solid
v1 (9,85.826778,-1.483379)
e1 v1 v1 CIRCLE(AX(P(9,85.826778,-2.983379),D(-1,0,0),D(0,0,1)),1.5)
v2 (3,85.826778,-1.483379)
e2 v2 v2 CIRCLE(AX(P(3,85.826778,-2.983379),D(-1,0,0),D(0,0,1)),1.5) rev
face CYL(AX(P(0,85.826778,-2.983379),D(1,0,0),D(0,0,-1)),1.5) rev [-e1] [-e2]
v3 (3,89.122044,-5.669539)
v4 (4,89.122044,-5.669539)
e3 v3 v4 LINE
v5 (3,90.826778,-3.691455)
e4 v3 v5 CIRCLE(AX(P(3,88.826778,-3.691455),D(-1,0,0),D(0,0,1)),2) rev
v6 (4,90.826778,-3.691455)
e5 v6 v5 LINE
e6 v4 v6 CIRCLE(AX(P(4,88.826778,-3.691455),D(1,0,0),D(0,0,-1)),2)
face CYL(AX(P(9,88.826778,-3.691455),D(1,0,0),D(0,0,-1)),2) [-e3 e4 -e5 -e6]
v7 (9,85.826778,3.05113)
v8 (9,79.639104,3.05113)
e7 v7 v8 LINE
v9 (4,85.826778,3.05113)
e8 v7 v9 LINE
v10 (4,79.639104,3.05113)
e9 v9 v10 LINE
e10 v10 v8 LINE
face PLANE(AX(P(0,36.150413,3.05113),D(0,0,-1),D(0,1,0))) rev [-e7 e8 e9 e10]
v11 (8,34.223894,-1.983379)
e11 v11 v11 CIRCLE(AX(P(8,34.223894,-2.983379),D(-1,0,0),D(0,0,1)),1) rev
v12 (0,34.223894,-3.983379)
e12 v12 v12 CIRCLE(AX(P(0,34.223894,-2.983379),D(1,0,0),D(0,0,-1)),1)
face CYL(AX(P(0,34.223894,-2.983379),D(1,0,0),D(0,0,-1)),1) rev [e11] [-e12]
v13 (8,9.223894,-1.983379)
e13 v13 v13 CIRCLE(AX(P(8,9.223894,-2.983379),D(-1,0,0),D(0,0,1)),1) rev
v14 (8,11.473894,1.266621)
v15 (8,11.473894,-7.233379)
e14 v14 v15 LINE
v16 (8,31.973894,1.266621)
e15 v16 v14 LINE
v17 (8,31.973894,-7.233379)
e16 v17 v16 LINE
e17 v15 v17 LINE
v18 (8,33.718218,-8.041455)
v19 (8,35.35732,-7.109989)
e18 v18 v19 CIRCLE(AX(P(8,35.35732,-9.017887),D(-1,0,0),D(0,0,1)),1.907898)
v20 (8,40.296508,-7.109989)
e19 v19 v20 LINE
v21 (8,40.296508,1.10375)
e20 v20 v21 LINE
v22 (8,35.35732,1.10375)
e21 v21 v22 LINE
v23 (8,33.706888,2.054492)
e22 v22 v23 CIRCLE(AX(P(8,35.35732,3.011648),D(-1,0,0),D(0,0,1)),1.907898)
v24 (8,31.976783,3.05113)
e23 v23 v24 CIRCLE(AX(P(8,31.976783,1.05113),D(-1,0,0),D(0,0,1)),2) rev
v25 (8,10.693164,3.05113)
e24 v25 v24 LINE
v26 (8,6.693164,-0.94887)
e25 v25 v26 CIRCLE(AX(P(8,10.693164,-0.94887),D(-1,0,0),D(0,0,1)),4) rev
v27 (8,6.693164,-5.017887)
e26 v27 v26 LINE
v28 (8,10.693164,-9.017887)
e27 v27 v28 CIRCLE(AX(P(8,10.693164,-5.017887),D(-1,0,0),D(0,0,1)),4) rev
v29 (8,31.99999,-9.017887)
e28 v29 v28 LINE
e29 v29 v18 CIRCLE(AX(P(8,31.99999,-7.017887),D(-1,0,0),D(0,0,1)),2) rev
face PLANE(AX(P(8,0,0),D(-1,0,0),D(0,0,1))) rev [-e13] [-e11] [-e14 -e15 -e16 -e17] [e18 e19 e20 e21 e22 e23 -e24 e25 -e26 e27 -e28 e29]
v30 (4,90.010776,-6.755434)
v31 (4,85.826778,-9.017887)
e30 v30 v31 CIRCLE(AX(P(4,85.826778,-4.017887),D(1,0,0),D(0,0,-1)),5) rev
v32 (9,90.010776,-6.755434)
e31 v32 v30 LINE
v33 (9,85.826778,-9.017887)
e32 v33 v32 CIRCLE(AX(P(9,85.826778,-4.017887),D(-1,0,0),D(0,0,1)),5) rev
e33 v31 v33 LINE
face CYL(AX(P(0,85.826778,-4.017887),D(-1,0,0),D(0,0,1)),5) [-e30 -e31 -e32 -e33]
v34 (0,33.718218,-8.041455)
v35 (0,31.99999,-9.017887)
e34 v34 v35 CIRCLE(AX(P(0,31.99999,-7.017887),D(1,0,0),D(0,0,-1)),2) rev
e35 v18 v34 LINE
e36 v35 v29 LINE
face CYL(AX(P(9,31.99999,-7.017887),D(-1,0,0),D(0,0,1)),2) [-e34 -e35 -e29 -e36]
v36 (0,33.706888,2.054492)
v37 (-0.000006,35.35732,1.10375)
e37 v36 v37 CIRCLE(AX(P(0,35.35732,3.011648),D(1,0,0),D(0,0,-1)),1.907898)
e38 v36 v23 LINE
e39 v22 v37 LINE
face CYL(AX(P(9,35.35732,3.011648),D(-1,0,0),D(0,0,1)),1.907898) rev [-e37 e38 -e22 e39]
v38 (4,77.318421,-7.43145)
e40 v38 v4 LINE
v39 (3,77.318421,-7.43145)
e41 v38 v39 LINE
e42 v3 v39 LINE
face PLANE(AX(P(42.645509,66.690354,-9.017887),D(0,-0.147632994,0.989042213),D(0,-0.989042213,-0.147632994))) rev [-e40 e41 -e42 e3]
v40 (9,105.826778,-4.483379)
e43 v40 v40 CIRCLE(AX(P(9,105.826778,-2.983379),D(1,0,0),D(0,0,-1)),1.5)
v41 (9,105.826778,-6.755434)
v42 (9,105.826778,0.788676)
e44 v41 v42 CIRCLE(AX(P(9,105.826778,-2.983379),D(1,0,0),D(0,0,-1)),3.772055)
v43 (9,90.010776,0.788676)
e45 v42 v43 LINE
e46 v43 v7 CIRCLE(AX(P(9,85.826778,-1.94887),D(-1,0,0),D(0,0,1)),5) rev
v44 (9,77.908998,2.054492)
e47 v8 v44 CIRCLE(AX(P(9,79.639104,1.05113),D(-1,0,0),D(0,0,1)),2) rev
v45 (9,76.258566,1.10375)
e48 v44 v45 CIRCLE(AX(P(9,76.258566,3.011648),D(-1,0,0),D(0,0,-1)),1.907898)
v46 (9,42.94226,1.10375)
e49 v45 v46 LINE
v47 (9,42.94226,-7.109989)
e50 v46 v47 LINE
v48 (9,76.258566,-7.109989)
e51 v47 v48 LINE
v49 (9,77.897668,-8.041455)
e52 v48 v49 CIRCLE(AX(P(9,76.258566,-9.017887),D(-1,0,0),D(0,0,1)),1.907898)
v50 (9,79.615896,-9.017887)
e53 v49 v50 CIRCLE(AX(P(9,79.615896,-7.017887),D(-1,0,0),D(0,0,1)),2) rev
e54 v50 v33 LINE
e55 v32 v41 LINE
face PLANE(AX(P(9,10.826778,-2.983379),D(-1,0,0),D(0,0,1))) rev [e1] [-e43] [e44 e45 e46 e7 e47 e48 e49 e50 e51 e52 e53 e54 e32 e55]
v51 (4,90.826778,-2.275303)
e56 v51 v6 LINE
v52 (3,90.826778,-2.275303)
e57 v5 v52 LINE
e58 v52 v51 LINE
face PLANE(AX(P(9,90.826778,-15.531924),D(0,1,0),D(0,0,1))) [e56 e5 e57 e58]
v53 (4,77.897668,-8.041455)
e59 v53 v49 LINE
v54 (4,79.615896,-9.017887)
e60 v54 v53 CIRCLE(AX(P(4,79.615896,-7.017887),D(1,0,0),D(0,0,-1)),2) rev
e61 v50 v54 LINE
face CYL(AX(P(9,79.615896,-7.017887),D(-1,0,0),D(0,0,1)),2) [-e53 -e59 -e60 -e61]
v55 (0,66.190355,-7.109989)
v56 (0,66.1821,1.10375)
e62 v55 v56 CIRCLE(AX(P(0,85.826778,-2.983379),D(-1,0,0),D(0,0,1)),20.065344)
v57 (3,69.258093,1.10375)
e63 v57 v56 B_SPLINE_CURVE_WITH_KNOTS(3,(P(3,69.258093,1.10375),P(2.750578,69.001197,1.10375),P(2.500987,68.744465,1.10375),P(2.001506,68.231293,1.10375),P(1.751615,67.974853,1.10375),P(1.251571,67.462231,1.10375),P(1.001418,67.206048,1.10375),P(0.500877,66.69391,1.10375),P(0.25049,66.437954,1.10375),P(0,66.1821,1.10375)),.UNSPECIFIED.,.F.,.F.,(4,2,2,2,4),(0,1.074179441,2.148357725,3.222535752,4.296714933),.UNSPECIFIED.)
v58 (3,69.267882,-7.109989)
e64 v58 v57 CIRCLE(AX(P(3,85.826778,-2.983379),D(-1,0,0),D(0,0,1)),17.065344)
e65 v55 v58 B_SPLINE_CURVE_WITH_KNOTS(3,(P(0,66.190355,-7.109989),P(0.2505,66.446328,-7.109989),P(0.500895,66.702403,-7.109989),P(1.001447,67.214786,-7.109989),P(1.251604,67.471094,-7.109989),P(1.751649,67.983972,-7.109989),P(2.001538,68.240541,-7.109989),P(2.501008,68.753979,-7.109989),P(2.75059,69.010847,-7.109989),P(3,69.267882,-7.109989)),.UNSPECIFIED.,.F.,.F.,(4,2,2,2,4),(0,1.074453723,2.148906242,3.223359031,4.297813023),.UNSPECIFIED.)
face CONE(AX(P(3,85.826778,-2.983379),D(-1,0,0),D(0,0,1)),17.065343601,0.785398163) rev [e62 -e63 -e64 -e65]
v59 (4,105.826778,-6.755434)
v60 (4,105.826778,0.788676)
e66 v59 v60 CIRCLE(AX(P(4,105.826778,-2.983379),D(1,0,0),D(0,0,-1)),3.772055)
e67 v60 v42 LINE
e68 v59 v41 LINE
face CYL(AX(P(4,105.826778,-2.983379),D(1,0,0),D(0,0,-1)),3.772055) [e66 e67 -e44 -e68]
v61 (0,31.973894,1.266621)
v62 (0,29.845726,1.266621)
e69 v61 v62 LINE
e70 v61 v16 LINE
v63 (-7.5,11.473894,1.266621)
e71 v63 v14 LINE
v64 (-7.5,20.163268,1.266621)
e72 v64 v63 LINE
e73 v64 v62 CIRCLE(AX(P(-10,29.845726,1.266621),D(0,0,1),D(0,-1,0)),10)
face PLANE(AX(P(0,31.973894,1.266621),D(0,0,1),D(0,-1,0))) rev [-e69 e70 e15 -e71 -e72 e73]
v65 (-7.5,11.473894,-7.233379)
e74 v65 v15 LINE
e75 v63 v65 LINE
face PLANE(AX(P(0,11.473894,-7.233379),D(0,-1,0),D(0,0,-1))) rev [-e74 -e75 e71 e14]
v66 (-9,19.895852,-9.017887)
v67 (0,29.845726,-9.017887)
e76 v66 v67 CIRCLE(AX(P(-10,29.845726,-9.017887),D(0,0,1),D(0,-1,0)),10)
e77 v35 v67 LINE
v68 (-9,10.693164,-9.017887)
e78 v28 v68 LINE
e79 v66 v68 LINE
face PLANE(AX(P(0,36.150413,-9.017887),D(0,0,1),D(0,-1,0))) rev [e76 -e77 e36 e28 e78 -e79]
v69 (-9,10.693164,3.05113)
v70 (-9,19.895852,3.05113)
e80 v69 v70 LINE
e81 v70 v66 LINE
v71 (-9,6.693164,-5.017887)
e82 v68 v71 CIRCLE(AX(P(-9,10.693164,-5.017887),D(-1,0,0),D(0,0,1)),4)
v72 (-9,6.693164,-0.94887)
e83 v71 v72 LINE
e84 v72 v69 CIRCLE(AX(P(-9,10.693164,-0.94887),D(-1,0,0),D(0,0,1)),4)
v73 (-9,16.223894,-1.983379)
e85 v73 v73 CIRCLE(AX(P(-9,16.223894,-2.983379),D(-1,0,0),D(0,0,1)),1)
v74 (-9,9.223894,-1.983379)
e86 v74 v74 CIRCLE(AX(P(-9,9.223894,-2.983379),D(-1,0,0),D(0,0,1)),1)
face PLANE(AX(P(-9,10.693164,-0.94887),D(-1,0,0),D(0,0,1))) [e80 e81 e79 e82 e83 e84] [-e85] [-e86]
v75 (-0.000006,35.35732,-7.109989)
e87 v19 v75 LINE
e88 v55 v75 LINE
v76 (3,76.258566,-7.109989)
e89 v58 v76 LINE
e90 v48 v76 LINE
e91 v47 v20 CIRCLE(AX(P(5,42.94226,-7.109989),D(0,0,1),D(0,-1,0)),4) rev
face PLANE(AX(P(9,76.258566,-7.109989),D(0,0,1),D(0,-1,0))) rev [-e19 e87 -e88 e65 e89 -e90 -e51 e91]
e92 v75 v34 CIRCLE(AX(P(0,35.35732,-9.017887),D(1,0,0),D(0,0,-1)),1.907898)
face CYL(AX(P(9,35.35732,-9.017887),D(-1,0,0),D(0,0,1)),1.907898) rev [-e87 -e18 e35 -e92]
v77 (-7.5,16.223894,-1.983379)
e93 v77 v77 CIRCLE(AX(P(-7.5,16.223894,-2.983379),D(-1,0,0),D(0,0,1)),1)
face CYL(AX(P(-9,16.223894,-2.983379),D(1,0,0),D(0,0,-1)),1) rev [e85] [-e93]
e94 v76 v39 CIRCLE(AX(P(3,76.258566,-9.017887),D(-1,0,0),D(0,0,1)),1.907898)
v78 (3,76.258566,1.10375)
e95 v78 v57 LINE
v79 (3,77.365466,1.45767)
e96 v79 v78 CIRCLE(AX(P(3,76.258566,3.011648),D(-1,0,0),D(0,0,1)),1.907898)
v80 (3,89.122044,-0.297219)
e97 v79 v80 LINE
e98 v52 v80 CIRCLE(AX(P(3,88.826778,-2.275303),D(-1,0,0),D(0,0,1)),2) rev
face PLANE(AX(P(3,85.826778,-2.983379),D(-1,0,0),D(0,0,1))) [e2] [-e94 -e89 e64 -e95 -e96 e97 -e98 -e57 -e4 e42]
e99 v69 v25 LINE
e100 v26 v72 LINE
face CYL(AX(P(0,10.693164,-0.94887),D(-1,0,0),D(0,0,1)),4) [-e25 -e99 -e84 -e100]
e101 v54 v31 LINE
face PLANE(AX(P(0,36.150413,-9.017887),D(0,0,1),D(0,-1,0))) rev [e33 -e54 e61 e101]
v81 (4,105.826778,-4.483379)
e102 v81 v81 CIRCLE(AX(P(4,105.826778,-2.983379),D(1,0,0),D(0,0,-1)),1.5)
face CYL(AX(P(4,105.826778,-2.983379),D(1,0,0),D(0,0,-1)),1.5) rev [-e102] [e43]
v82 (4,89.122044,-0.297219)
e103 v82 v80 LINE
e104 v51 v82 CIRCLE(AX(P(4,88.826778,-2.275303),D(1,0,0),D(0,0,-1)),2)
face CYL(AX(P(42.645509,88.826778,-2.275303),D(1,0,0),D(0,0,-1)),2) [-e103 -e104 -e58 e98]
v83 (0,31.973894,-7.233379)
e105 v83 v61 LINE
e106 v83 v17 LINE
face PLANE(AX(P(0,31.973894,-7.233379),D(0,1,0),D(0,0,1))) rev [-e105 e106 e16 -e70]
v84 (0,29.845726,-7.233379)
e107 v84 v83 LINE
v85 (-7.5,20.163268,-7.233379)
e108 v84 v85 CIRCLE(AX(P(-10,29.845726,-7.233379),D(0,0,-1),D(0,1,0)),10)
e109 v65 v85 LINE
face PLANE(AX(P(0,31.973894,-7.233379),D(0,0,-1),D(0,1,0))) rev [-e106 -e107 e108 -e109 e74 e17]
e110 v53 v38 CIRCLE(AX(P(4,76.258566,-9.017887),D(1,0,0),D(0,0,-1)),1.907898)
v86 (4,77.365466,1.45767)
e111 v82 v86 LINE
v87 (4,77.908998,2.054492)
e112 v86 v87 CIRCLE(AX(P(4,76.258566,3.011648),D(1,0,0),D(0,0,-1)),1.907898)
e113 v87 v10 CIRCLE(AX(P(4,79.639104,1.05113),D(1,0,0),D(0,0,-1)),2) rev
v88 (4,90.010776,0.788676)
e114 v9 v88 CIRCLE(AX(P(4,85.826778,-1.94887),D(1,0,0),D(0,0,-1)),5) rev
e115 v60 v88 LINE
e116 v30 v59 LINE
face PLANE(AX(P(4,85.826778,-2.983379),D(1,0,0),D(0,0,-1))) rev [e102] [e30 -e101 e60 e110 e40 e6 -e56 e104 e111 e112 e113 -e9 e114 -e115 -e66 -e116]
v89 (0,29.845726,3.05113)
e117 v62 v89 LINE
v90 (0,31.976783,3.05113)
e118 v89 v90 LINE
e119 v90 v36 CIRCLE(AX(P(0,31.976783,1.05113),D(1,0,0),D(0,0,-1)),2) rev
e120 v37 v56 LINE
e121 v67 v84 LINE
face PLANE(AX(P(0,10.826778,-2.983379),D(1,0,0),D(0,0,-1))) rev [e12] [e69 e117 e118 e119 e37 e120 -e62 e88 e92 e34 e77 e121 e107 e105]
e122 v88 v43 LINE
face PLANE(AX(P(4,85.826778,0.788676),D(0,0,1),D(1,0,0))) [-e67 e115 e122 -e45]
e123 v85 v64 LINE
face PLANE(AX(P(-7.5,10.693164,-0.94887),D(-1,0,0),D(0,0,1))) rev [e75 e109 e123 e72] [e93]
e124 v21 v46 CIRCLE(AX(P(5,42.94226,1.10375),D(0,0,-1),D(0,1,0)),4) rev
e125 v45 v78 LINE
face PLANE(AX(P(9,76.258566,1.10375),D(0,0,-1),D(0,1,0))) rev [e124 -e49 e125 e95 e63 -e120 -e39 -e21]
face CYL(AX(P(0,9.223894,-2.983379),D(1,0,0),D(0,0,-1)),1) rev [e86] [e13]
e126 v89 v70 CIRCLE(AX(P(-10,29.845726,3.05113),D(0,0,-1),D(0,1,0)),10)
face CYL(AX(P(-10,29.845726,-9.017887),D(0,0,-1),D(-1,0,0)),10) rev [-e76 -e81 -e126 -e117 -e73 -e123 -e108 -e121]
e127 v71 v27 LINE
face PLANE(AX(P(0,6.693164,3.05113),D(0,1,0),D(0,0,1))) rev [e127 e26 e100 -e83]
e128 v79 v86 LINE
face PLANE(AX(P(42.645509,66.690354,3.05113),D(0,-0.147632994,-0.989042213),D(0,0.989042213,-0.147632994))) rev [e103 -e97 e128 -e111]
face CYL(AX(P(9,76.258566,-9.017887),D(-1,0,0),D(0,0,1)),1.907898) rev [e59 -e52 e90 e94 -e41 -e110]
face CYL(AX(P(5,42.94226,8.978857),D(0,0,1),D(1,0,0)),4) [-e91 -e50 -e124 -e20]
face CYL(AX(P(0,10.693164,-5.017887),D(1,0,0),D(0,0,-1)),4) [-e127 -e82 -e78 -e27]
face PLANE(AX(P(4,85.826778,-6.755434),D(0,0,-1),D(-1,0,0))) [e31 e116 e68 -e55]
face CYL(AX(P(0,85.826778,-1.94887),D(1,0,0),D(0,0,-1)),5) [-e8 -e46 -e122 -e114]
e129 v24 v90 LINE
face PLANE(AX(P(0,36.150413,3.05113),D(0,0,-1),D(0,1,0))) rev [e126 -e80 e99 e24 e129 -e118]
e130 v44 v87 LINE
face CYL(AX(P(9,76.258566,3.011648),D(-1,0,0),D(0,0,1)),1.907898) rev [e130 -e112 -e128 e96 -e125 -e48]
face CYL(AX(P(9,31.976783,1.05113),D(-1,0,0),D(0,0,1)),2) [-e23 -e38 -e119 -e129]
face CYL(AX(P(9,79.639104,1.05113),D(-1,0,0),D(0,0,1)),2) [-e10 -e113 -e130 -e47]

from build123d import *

# Parameters (mm, degrees)
SKETCH1_R               = 10
SKETCH1_R_2             = 0.8
SKETCH1_R_3             = 3.301767793
BOSS_EXTRUDE1_DEPTH     = 1.5
SKETCH2_R               = 10
BOSS_EXTRUDE2_DEPTH     = 9
CUT_EXTRUDE1_DEPTH      = 93.583714931
CUT_EXTRUDE1_DEPTH_BACK = 93.583714931
SKETCH3_R               = 1.5
FILLET1_R               = 5
SKETCH4_R               = 1.5
BOSS_EXTRUDE3_DEPTH     = 5
CUT_EXTRUDE2_DEPTH      = 4
FILLET3_R               = 2
SKETCH6_W               = 12.069016708
SKETCH6_H               = 36.150412664
BOSS_EXTRUDE4_DEPTH     = 9
CUT_EXTRUDE3_DEPTH      = 112.059195252
CUT_EXTRUDE3_DEPTH_BACK = 112.059195252
CUT_EXTRUDE4_DEPTH      = 111.336877259
CUT_EXTRUDE4_DEPTH_BACK = 111.336877259
SKETCH8_R               = 1
SKETCH8_W               = 8.5
SKETCH8_H               = 20.5
FILLET4_R               = 4
SKETCH9_W               = 24.382356312
SKETCH9_H               = 41.210730196
CUT_EXTRUDE5_DEPTH      = 1
FILLET5_R               = 4
SKETCH10_R              = 20.065343601
CUT_EXTRUDE6_DEPTH      = 3
CUT_EXTRUDE7_DEPTH      = 111.33687725
CUT_EXTRUDE7_DEPTH_BACK = 111.33687725
FILLET6_R               = 2
CHAMFER1_SIZE           = 3
BOSS_EXTRUDE5_START     = 9
SKETCH12_R              = 1
BOSS_EXTRUDE5_DEPTH     = 9
SKETCH14_W              = 8.5
SKETCH14_H              = 8.421957495
CUT_EXTRUDE8_DEPTH      = 7.5
FILLET7_R               = 10


# Some blends are built 0.0001 mm under size
with BuildPart() as part:
    # Sketch1 → Boss-Extrude1 (new body)
    with BuildSketch(Plane(origin=(0, 0, 0), x_dir=(0, 0, -1), z_dir=(1, 0, 0))):
        with Locations((2.983378847, 10.826778074)):
            Circle(SKETCH1_R)
        with Locations((2.983378847, 18.576778074)):
            Circle(SKETCH1_R_2, mode=Mode.SUBTRACT)
        with Locations((2.983378847, 3.076778074)):
            Circle(SKETCH1_R_2, mode=Mode.SUBTRACT)
        with Locations((-3.266621153, 10.826778074)):
            Circle(SKETCH1_R_2, mode=Mode.SUBTRACT)
        with Locations((9.233378847, 10.826778074)):
            Circle(SKETCH1_R_2, mode=Mode.SUBTRACT)
        with Locations((2.983378847, 10.826778074)):
            Circle(SKETCH1_R_3, mode=Mode.SUBTRACT)
    extrude(amount=BOSS_EXTRUDE1_DEPTH)

    # Sketch2 → Boss-Extrude2 (add)
    with BuildSketch(Plane.ZY):
        with BuildLine():
            Line((-15.531923741, 90.826778074), (9.565166047, 90.826778074))
            Line((9.565166047, 90.826778074), (9.565166047, 10.826778074))
            ThreePointArc((9.565166047, 10.826778074), (-2.983378847, -1.721766821), (-15.531923741, 10.826778074))
            Line((-15.531923741, 10.826778074), (-15.531923741, 90.826778074))
        make_face()
        with Locations((-2.983378847, 10.826778074)):
            Circle(SKETCH2_R, mode=Mode.SUBTRACT)
    extrude(amount=-BOSS_EXTRUDE2_DEPTH)

    # Sketch3 → Cut-Extrude1 (cut, two sides: drawn at the far end of the back side and taken through both)
    with BuildSketch(Plane(origin=(9, 0, 0), x_dir=(0, 0, -1), z_dir=(1, 0, 0)).offset(-CUT_EXTRUDE1_DEPTH_BACK)):
        with Locations((2.983378847, 85.826778074)):
            Circle(SKETCH3_R)
        with BuildLine():
            Line((-3.051129507, 36.150412664), (-3.051129507, 97.572569437))
            Line((-3.051129507, 97.572569437), (-16.389018159, 97.572569437))
            Line((-16.389018159, 97.572569437), (-16.389018159, 8.14109285))
            Line((-16.389018159, 8.14109285), (-9.565166047, 10.826778074))
            add(Edge.make_bspline(
                [(-9.565166047, 10.826778074), (-9.644230884, 15.122204253), (-6.916245701, 23.507010268), (-3.42826878, 31.561714956), (-3.051129507, 36.150412664)],
                knots=[0, 0, 0, 0, 0.482384809, 1, 1, 1, 1], degree=3))
        make_face()
        with BuildLine():
            Line((22.355775853, 8.14109285), (15.531923741, 10.826778074))
            add(Edge.make_bspline(
                [(15.531923741, 10.826778074), (15.610988578, 15.122204253), (12.883003395, 23.507010268), (9.395026474, 31.561714956), (9.017887201, 36.150412664)],
                knots=[0, 0, 0, 0, 0.482384809, 1, 1, 1, 1], degree=3))
            Line((9.017887201, 36.150412664), (9.017887201, 97.572569437))
            Line((9.017887201, 97.572569437), (22.355775853, 97.572569437))
            Line((22.355775853, 97.572569437), (22.355775853, 8.14109285))
        make_face()
    extrude(amount=CUT_EXTRUDE1_DEPTH + CUT_EXTRUDE1_DEPTH_BACK, mode=Mode.SUBTRACT)

    # Fillet1
    fillet1_edges = [part.edges().sort_by_distance(p)[0] for p in [
        (4.5, 90.826778074, 3.051129507),
        (4.5, 90.826778074, -9.017887201),
    ]]
    fillet(fillet1_edges, radius=FILLET1_R)

    # Sketch4 → Boss-Extrude3 (add)
    with BuildSketch(Plane(origin=(9, 0, 0), x_dir=(0, 0, -1), z_dir=(1, 0, 0))):
        with BuildLine():
            Line((-0.788675957, 85.826778074), (-0.788675957, 105.826778074))
            ThreePointArc((-0.788675957, 105.826778074), (2.983378847, 109.598832877), (6.755433651, 105.826778074))
            Line((6.755433651, 105.826778074), (6.755433651, 85.826778074))
            ThreePointArc((6.755433651, 85.826778074), (2.983378847, 82.05472327), (-0.788675957, 85.826778074))
        make_face()
        with Locations((2.983378847, 105.826778074)):
            Circle(SKETCH4_R, mode=Mode.SUBTRACT)
        with Locations((2.983378847, 85.826778074)):
            Circle(SKETCH4_R, mode=Mode.SUBTRACT)
    extrude(amount=-BOSS_EXTRUDE3_DEPTH)

    # Sketch5 → Cut-Extrude2 (cut)
    with BuildSketch(Plane.ZY):
        Polygon((3.051129507, 66.690354093), (-0.520583075, 90.618436978), (8.994411849, 90.618436978), (4.452818785, 66.690354093), align=None)
        Polygon((-9.017887201, 66.690354093), (-5.446174619, 90.618436978), (-12.469802715, 95.280611626), (-31.447569196, 66.690354093), align=None)
    extrude(amount=-CUT_EXTRUDE2_DEPTH, mode=Mode.SUBTRACT)

    # Fillet3
    fillet3_edges = [part.edges().sort_by_distance(p)[0] for p in [
        (2, 90.618436978, -5.446174619),
        (2, 90.618436978, -0.520583075),
    ]]
    fillet(fillet3_edges, radius=FILLET3_R)

    # Sketch6 → Boss-Extrude4 (add)
    with BuildSketch(Plane(origin=(9, 0, 0), x_dir=(0, 0, -1), z_dir=(1, 0, 0))):
        with Locations((2.983378847, 18.075206332)):
            Rectangle(SKETCH6_W, SKETCH6_H)
    extrude(amount=-BOSS_EXTRUDE4_DEPTH)

    # Sketch7 → Cut-Extrude3 (cut, two sides: drawn at the far end of the back side and taken through both)
    with BuildSketch(Plane(origin=(9, 0, 0), x_dir=(0, 0, -1), z_dir=(1, 0, 0)).offset(-CUT_EXTRUDE3_DEPTH_BACK)):
        Polygon((-3.051129507, -1.9847985), (-23.499593466, -1.9847985), (-3.051129507, 36.150412664), (-3.051129507, 6.693164213), (9.017887201, 6.693164213), (9.017887201, 36.150412664), (33.091996179, 2.744303699), (9.017887201, -7.659721138), align=None)
    extrude(amount=CUT_EXTRUDE3_DEPTH + CUT_EXTRUDE3_DEPTH_BACK, mode=Mode.SUBTRACT)

    # Sketch8 → Cut-Extrude4 (cut, two sides: drawn at the far end of the back side and taken through both)
    with BuildSketch(Plane(origin=(9, 0, 0), x_dir=(0, 0, -1), z_dir=(1, 0, 0)).offset(-CUT_EXTRUDE4_DEPTH_BACK)):
        with Locations((2.983378847, 34.223894069)):
            Circle(SKETCH8_R)
        with Locations((2.983378847, 9.223894069)):
            Circle(SKETCH8_R)
        with Locations((2.983378847, 21.723894069)):
            Rectangle(SKETCH8_W, SKETCH8_H)
    extrude(amount=CUT_EXTRUDE4_DEPTH + CUT_EXTRUDE4_DEPTH_BACK, mode=Mode.SUBTRACT)

    # Fillet4
    fillet4_edges = [part.edges().sort_by_distance(p)[0] for p in [
        (4.5, 6.693164213, -9.017887201),
        (4.5, 6.693164213, 3.051129507),
    ]]
    fillet(fillet4_edges, radius=FILLET4_R)

    # Sketch9 → Cut-Extrude5 (cut)
    with BuildSketch(Plane(origin=(9, 0, 0), x_dir=(0, 0, -1), z_dir=(1, 0, 0))):
        with Locations((3.21232116, 19.691143361)):
            Rectangle(SKETCH9_W, SKETCH9_H)
    extrude(amount=-CUT_EXTRUDE5_DEPTH, mode=Mode.SUBTRACT)

    # Fillet5
    # the kernel refuses this fillet: 4 mm, written as the material it takes off along each edge
    with BuildSketch(Plane(origin=(9, 40.296508459, -15.632265479), x_dir=(0, 1, 0), z_dir=(0, 0, 1))) as fillet5_piece_1:
        with BuildLine():
            CenterArc((2.645751311, 4), FILLET5_R, 228.590377891, 41.409622109)
            Line((0, 1), (-0.052915026, 0.94))
            ThreePointArc((-0.052915026, 0.94), (-0.08, 0.5), (-0.08, 0))
            Line((-0.08, 0), (0, -0.08))
            Line((0, -0.08), (2.645751311, -0.08))
            Line((2.645751311, -0.08), (2.645751311, 0))
        make_face()
    extrude(amount=25.297773264, mode=Mode.SUBTRACT)

    # Sketch10 → Cut-Extrude6 (cut)
    with BuildSketch(Plane.ZY):
        with Locations((-2.983378847, 85.826778074)):
            Circle(SKETCH10_R)
    extrude(amount=-CUT_EXTRUDE6_DEPTH, mode=Mode.SUBTRACT)

    # Sketch11 → Cut-Extrude7 (cut, two sides: drawn at the far end of the back side and taken through both)
    with BuildSketch(Plane.ZY.offset(-CUT_EXTRUDE7_DEPTH_BACK)):
        with BuildLine():
            Line((-7.109989343, 76.258566083), (-7.109989343, 35.357320381))
            ThreePointArc((-7.109989343, 35.357320381), (-9.017887201, 33.449422522), (-10.925785059, 35.357320381))
            Line((-10.925785059, 35.357320381), (-10.925785059, 76.258566083))
            ThreePointArc((-10.925785059, 76.258566083), (-9.017887201, 78.166463942), (-7.109989343, 76.258566083))
        make_face()
        with BuildLine():
            Line((1.103749815, 76.258566083), (1.103749815, 35.357320381))
            ThreePointArc((1.103749815, 35.357320381), (3.011647673, 33.449422522), (4.919545531, 35.357320381))
            Line((4.919545531, 35.357320381), (4.919545531, 76.258566083))
            ThreePointArc((4.919545531, 76.258566083), (3.011647673, 78.166463942), (1.103749815, 76.258566083))
        make_face()
    extrude(amount=CUT_EXTRUDE7_DEPTH + CUT_EXTRUDE7_DEPTH_BACK, mode=Mode.SUBTRACT)

    # Fillet6
    fillet6_edges = [part.edges().sort_by_distance(p)[0] for p in [
        (4, 33.449422522, -9.017887201),
        (4, 33.449831083, 3.051129507),
        (6.5, 78.166463942, -9.017887201),
        (6.5, 78.166055381, 3.051129507),
    ]]
    fillet(fillet6_edges, radius=FILLET6_R)

    # Chamfer1
    chamfer1_edges = [part.edges().sort_by_distance(p)[0] for p in [
        (3, 65.761444608, -3.003546718),
    ]]
    chamfer(chamfer1_edges, length=CHAMFER1_SIZE - 0.0001)  # a hair under: the kernel refuses the full size

    # Sketch12 → Boss-Extrude5 (add)
    with BuildSketch(Plane.ZY.offset(BOSS_EXTRUDE5_START)):
        with BuildLine():
            Line((-5.017887201, 6.693164213), (-0.948870493, 6.693164213))
            ThreePointArc((-0.948870493, 6.693164213), (1.879556632, 7.864737088), (3.051129507, 10.693164213))
            Line((3.051129507, 10.693164213), (3.051129507, 19.895851564))
            Line((3.051129507, 19.895851564), (-9.017887201, 19.895851564))
            Line((-9.017887201, 19.895851564), (-9.017887201, 10.693164213))
            ThreePointArc((-9.017887201, 10.693164213), (-7.846314326, 7.864737088), (-5.017887201, 6.693164213))
        make_face()
        with Locations((-2.983378847, 16.223894069)):
            Circle(SKETCH12_R, mode=Mode.SUBTRACT)
        with Locations((-2.983378847, 9.223894069)):
            Circle(SKETCH12_R, mode=Mode.SUBTRACT)
    extrude(amount=-BOSS_EXTRUDE5_DEPTH)

    # Sketch14 → Cut-Extrude8 (cut)
    with BuildSketch(Plane(origin=(0, 0, 0), x_dir=(0, 0, -1), z_dir=(1, 0, 0))):
        with Locations((2.983378847, 15.684872817)):
            Rectangle(SKETCH14_W, SKETCH14_H)
    extrude(amount=-CUT_EXTRUDE8_DEPTH, mode=Mode.SUBTRACT)

    # Fillet7
    # the kernel refuses this fillet: 10 mm, written as the material it adds along each edge
    with BuildSketch(Plane(origin=(0, 19.895851564, 3.051129507), x_dir=(-1, 0, 0), z_dir=(0, 0, -1))) as fillet7_piece_1_section:
        with BuildLine():
            CenterArc((10, 9.949874371), FILLET7_R, 180, 84.260829523)
            Line((0, 9.949874371), (-0.2, 9.949874371))
            Line((-0.2, 9.949874371), (-0.2, 0))
            Line((-0.2, 0), (0, -0.2))
            ThreePointArc((0, -0.2), (4.5, -0.2), (8.98, -0.198997487))
            Line((8.98, -0.198997487), (9, 0))
        make_face()
    fillet7_piece_1 = extrude(amount=1.784508354, mode=Mode.PRIVATE)
    fillet7_piece_1 = split(fillet7_piece_1, bisect_by=Plane(origin=(-7.5, 19.86328745, 2.15887533), z_dir=(-1, 0, 0)), keep=Keep.TOP, mode=Mode.PRIVATE)
    add(fillet7_piece_1)
    with BuildSketch(Plane(origin=(0, 19.895851564, 3.051129507), x_dir=(-1, 0, 0), z_dir=(0, 0, -1))) as fillet7_piece_2_section:
        with BuildLine():
            CenterArc((10, 9.949874371), FILLET7_R, 180, 84.260829523)
            Line((0, 9.949874371), (-0.2, 9.949874371))
            Line((-0.2, 9.949874371), (-0.2, 0))
            Line((-0.2, 0), (0, -0.2))
            ThreePointArc((0, -0.2), (4.5, -0.2), (8.98, -0.198997487))
            Line((8.98, -0.198997487), (9, 0))
        make_face()
    fillet7_piece_2 = extrude(amount=1.784508354, mode=Mode.PRIVATE)
    fillet7_piece_2 = split(fillet7_piece_2, bisect_by=Plane(origin=(-7.5, 22.222346104, 2.15887533), z_dir=(1, 0, 0)), keep=Keep.TOP, mode=Mode.PRIVATE)
    add(fillet7_piece_2)
    with BuildSketch(Plane(origin=(0, 19.895851564, 3.051129507), x_dir=(-1, 0, 0), z_dir=(0, 0, -1))) as fillet7_piece_3_section:
        with BuildLine():
            CenterArc((10, 9.949874371), FILLET7_R, 180, 84.260829523)
            Line((0, 9.949874371), (-0.2, 9.949874371))
            Line((-0.2, 9.949874371), (-0.2, 0))
            Line((-0.2, 0), (0, -0.2))
            ThreePointArc((0, -0.2), (4.5, -0.2), (8.98, -0.198997487))
            Line((8.98, -0.198997487), (9, 0))
        make_face()
    fillet7_piece_3 = extrude(amount=26.659194282, mode=Mode.PRIVATE)
    fillet7_piece_3 = split(fillet7_piece_3, bisect_by=Plane(origin=(-7.5, 19.86328745, -2.983378847), z_dir=(-1, 0, 0)), keep=Keep.TOP, mode=Mode.PRIVATE)
    fillet7_piece_3 = split(fillet7_piece_3, bisect_by=Plane(origin=(-8.13962248, 19.86328745, 1.266621153), z_dir=(0, 0, -1)), keep=Keep.TOP, mode=Mode.PRIVATE)
    fillet7_piece_3 = split(fillet7_piece_3, bisect_by=Plane(origin=(-8.13962248, 19.86328745, -7.233378847), z_dir=(0, 0, 1)), keep=Keep.TOP, mode=Mode.PRIVATE)
    add(fillet7_piece_3)
    with BuildSketch(Plane(origin=(0, 19.895851564, 3.051129507), x_dir=(-1, 0, 0), z_dir=(0, 0, -1))) as fillet7_piece_4_section:
        with BuildLine():
            CenterArc((10, 9.949874371), FILLET7_R, 180, 84.260829523)
            Line((0, 9.949874371), (-0.2, 9.949874371))
            Line((-0.2, 9.949874371), (-0.2, 0))
            Line((-0.2, 0), (0, -0.2))
            ThreePointArc((0, -0.2), (4.5, -0.2), (8.98, -0.198997487))
            Line((8.98, -0.198997487), (9, 0))
        make_face()
    fillet7_piece_4 = extrude(amount=26.659194282, mode=Mode.PRIVATE)
    fillet7_piece_4 = split(fillet7_piece_4, bisect_by=Plane(origin=(-8.13962248, 19.86328745, -9.017887201), z_dir=(0, 0, 1)), keep=Keep.TOP, mode=Mode.PRIVATE)
    fillet7_piece_4 = split(fillet7_piece_4, bisect_by=Plane(origin=(-7.5, 19.86328745, -8.125633024), z_dir=(-1, 0, 0)), keep=Keep.TOP, mode=Mode.PRIVATE)
    fillet7_piece_4 = split(fillet7_piece_4, bisect_by=Plane(origin=(-8.13962248, 19.86328745, -7.233378847), z_dir=(0, 0, -1)), keep=Keep.TOP, mode=Mode.PRIVATE)
    add(fillet7_piece_4)
    with BuildSketch(Plane(origin=(0, 19.895851564, 3.051129507), x_dir=(-1, 0, 0), z_dir=(0, 0, -1))) as fillet7_piece_5_section:
        with BuildLine():
            CenterArc((10, 9.949874371), FILLET7_R, 180, 84.260829523)
            Line((0, 9.949874371), (-0.2, 9.949874371))
            Line((-0.2, 9.949874371), (-0.2, 0))
            Line((-0.2, 0), (0, -0.2))
            ThreePointArc((0, -0.2), (4.5, -0.2), (8.98, -0.198997487))
            Line((8.98, -0.198997487), (9, 0))
        make_face()
    fillet7_piece_5 = extrude(amount=26.659194282, mode=Mode.PRIVATE)
    fillet7_piece_5 = split(fillet7_piece_5, bisect_by=Plane(origin=(-2.047205635, 22.222346104, -9.017887201), z_dir=(0, 0, 1)), keep=Keep.TOP, mode=Mode.PRIVATE)
    fillet7_piece_5 = split(fillet7_piece_5, bisect_by=Plane(origin=(-7.5, 22.222346104, -8.125633024), z_dir=(1, 0, 0)), keep=Keep.TOP, mode=Mode.PRIVATE)
    fillet7_piece_5 = split(fillet7_piece_5, bisect_by=Plane(origin=(-2.047205635, 22.222346104, -7.233378847), z_dir=(0, 0, -1)), keep=Keep.TOP, mode=Mode.PRIVATE)
    add(fillet7_piece_5)


solid = part.part
